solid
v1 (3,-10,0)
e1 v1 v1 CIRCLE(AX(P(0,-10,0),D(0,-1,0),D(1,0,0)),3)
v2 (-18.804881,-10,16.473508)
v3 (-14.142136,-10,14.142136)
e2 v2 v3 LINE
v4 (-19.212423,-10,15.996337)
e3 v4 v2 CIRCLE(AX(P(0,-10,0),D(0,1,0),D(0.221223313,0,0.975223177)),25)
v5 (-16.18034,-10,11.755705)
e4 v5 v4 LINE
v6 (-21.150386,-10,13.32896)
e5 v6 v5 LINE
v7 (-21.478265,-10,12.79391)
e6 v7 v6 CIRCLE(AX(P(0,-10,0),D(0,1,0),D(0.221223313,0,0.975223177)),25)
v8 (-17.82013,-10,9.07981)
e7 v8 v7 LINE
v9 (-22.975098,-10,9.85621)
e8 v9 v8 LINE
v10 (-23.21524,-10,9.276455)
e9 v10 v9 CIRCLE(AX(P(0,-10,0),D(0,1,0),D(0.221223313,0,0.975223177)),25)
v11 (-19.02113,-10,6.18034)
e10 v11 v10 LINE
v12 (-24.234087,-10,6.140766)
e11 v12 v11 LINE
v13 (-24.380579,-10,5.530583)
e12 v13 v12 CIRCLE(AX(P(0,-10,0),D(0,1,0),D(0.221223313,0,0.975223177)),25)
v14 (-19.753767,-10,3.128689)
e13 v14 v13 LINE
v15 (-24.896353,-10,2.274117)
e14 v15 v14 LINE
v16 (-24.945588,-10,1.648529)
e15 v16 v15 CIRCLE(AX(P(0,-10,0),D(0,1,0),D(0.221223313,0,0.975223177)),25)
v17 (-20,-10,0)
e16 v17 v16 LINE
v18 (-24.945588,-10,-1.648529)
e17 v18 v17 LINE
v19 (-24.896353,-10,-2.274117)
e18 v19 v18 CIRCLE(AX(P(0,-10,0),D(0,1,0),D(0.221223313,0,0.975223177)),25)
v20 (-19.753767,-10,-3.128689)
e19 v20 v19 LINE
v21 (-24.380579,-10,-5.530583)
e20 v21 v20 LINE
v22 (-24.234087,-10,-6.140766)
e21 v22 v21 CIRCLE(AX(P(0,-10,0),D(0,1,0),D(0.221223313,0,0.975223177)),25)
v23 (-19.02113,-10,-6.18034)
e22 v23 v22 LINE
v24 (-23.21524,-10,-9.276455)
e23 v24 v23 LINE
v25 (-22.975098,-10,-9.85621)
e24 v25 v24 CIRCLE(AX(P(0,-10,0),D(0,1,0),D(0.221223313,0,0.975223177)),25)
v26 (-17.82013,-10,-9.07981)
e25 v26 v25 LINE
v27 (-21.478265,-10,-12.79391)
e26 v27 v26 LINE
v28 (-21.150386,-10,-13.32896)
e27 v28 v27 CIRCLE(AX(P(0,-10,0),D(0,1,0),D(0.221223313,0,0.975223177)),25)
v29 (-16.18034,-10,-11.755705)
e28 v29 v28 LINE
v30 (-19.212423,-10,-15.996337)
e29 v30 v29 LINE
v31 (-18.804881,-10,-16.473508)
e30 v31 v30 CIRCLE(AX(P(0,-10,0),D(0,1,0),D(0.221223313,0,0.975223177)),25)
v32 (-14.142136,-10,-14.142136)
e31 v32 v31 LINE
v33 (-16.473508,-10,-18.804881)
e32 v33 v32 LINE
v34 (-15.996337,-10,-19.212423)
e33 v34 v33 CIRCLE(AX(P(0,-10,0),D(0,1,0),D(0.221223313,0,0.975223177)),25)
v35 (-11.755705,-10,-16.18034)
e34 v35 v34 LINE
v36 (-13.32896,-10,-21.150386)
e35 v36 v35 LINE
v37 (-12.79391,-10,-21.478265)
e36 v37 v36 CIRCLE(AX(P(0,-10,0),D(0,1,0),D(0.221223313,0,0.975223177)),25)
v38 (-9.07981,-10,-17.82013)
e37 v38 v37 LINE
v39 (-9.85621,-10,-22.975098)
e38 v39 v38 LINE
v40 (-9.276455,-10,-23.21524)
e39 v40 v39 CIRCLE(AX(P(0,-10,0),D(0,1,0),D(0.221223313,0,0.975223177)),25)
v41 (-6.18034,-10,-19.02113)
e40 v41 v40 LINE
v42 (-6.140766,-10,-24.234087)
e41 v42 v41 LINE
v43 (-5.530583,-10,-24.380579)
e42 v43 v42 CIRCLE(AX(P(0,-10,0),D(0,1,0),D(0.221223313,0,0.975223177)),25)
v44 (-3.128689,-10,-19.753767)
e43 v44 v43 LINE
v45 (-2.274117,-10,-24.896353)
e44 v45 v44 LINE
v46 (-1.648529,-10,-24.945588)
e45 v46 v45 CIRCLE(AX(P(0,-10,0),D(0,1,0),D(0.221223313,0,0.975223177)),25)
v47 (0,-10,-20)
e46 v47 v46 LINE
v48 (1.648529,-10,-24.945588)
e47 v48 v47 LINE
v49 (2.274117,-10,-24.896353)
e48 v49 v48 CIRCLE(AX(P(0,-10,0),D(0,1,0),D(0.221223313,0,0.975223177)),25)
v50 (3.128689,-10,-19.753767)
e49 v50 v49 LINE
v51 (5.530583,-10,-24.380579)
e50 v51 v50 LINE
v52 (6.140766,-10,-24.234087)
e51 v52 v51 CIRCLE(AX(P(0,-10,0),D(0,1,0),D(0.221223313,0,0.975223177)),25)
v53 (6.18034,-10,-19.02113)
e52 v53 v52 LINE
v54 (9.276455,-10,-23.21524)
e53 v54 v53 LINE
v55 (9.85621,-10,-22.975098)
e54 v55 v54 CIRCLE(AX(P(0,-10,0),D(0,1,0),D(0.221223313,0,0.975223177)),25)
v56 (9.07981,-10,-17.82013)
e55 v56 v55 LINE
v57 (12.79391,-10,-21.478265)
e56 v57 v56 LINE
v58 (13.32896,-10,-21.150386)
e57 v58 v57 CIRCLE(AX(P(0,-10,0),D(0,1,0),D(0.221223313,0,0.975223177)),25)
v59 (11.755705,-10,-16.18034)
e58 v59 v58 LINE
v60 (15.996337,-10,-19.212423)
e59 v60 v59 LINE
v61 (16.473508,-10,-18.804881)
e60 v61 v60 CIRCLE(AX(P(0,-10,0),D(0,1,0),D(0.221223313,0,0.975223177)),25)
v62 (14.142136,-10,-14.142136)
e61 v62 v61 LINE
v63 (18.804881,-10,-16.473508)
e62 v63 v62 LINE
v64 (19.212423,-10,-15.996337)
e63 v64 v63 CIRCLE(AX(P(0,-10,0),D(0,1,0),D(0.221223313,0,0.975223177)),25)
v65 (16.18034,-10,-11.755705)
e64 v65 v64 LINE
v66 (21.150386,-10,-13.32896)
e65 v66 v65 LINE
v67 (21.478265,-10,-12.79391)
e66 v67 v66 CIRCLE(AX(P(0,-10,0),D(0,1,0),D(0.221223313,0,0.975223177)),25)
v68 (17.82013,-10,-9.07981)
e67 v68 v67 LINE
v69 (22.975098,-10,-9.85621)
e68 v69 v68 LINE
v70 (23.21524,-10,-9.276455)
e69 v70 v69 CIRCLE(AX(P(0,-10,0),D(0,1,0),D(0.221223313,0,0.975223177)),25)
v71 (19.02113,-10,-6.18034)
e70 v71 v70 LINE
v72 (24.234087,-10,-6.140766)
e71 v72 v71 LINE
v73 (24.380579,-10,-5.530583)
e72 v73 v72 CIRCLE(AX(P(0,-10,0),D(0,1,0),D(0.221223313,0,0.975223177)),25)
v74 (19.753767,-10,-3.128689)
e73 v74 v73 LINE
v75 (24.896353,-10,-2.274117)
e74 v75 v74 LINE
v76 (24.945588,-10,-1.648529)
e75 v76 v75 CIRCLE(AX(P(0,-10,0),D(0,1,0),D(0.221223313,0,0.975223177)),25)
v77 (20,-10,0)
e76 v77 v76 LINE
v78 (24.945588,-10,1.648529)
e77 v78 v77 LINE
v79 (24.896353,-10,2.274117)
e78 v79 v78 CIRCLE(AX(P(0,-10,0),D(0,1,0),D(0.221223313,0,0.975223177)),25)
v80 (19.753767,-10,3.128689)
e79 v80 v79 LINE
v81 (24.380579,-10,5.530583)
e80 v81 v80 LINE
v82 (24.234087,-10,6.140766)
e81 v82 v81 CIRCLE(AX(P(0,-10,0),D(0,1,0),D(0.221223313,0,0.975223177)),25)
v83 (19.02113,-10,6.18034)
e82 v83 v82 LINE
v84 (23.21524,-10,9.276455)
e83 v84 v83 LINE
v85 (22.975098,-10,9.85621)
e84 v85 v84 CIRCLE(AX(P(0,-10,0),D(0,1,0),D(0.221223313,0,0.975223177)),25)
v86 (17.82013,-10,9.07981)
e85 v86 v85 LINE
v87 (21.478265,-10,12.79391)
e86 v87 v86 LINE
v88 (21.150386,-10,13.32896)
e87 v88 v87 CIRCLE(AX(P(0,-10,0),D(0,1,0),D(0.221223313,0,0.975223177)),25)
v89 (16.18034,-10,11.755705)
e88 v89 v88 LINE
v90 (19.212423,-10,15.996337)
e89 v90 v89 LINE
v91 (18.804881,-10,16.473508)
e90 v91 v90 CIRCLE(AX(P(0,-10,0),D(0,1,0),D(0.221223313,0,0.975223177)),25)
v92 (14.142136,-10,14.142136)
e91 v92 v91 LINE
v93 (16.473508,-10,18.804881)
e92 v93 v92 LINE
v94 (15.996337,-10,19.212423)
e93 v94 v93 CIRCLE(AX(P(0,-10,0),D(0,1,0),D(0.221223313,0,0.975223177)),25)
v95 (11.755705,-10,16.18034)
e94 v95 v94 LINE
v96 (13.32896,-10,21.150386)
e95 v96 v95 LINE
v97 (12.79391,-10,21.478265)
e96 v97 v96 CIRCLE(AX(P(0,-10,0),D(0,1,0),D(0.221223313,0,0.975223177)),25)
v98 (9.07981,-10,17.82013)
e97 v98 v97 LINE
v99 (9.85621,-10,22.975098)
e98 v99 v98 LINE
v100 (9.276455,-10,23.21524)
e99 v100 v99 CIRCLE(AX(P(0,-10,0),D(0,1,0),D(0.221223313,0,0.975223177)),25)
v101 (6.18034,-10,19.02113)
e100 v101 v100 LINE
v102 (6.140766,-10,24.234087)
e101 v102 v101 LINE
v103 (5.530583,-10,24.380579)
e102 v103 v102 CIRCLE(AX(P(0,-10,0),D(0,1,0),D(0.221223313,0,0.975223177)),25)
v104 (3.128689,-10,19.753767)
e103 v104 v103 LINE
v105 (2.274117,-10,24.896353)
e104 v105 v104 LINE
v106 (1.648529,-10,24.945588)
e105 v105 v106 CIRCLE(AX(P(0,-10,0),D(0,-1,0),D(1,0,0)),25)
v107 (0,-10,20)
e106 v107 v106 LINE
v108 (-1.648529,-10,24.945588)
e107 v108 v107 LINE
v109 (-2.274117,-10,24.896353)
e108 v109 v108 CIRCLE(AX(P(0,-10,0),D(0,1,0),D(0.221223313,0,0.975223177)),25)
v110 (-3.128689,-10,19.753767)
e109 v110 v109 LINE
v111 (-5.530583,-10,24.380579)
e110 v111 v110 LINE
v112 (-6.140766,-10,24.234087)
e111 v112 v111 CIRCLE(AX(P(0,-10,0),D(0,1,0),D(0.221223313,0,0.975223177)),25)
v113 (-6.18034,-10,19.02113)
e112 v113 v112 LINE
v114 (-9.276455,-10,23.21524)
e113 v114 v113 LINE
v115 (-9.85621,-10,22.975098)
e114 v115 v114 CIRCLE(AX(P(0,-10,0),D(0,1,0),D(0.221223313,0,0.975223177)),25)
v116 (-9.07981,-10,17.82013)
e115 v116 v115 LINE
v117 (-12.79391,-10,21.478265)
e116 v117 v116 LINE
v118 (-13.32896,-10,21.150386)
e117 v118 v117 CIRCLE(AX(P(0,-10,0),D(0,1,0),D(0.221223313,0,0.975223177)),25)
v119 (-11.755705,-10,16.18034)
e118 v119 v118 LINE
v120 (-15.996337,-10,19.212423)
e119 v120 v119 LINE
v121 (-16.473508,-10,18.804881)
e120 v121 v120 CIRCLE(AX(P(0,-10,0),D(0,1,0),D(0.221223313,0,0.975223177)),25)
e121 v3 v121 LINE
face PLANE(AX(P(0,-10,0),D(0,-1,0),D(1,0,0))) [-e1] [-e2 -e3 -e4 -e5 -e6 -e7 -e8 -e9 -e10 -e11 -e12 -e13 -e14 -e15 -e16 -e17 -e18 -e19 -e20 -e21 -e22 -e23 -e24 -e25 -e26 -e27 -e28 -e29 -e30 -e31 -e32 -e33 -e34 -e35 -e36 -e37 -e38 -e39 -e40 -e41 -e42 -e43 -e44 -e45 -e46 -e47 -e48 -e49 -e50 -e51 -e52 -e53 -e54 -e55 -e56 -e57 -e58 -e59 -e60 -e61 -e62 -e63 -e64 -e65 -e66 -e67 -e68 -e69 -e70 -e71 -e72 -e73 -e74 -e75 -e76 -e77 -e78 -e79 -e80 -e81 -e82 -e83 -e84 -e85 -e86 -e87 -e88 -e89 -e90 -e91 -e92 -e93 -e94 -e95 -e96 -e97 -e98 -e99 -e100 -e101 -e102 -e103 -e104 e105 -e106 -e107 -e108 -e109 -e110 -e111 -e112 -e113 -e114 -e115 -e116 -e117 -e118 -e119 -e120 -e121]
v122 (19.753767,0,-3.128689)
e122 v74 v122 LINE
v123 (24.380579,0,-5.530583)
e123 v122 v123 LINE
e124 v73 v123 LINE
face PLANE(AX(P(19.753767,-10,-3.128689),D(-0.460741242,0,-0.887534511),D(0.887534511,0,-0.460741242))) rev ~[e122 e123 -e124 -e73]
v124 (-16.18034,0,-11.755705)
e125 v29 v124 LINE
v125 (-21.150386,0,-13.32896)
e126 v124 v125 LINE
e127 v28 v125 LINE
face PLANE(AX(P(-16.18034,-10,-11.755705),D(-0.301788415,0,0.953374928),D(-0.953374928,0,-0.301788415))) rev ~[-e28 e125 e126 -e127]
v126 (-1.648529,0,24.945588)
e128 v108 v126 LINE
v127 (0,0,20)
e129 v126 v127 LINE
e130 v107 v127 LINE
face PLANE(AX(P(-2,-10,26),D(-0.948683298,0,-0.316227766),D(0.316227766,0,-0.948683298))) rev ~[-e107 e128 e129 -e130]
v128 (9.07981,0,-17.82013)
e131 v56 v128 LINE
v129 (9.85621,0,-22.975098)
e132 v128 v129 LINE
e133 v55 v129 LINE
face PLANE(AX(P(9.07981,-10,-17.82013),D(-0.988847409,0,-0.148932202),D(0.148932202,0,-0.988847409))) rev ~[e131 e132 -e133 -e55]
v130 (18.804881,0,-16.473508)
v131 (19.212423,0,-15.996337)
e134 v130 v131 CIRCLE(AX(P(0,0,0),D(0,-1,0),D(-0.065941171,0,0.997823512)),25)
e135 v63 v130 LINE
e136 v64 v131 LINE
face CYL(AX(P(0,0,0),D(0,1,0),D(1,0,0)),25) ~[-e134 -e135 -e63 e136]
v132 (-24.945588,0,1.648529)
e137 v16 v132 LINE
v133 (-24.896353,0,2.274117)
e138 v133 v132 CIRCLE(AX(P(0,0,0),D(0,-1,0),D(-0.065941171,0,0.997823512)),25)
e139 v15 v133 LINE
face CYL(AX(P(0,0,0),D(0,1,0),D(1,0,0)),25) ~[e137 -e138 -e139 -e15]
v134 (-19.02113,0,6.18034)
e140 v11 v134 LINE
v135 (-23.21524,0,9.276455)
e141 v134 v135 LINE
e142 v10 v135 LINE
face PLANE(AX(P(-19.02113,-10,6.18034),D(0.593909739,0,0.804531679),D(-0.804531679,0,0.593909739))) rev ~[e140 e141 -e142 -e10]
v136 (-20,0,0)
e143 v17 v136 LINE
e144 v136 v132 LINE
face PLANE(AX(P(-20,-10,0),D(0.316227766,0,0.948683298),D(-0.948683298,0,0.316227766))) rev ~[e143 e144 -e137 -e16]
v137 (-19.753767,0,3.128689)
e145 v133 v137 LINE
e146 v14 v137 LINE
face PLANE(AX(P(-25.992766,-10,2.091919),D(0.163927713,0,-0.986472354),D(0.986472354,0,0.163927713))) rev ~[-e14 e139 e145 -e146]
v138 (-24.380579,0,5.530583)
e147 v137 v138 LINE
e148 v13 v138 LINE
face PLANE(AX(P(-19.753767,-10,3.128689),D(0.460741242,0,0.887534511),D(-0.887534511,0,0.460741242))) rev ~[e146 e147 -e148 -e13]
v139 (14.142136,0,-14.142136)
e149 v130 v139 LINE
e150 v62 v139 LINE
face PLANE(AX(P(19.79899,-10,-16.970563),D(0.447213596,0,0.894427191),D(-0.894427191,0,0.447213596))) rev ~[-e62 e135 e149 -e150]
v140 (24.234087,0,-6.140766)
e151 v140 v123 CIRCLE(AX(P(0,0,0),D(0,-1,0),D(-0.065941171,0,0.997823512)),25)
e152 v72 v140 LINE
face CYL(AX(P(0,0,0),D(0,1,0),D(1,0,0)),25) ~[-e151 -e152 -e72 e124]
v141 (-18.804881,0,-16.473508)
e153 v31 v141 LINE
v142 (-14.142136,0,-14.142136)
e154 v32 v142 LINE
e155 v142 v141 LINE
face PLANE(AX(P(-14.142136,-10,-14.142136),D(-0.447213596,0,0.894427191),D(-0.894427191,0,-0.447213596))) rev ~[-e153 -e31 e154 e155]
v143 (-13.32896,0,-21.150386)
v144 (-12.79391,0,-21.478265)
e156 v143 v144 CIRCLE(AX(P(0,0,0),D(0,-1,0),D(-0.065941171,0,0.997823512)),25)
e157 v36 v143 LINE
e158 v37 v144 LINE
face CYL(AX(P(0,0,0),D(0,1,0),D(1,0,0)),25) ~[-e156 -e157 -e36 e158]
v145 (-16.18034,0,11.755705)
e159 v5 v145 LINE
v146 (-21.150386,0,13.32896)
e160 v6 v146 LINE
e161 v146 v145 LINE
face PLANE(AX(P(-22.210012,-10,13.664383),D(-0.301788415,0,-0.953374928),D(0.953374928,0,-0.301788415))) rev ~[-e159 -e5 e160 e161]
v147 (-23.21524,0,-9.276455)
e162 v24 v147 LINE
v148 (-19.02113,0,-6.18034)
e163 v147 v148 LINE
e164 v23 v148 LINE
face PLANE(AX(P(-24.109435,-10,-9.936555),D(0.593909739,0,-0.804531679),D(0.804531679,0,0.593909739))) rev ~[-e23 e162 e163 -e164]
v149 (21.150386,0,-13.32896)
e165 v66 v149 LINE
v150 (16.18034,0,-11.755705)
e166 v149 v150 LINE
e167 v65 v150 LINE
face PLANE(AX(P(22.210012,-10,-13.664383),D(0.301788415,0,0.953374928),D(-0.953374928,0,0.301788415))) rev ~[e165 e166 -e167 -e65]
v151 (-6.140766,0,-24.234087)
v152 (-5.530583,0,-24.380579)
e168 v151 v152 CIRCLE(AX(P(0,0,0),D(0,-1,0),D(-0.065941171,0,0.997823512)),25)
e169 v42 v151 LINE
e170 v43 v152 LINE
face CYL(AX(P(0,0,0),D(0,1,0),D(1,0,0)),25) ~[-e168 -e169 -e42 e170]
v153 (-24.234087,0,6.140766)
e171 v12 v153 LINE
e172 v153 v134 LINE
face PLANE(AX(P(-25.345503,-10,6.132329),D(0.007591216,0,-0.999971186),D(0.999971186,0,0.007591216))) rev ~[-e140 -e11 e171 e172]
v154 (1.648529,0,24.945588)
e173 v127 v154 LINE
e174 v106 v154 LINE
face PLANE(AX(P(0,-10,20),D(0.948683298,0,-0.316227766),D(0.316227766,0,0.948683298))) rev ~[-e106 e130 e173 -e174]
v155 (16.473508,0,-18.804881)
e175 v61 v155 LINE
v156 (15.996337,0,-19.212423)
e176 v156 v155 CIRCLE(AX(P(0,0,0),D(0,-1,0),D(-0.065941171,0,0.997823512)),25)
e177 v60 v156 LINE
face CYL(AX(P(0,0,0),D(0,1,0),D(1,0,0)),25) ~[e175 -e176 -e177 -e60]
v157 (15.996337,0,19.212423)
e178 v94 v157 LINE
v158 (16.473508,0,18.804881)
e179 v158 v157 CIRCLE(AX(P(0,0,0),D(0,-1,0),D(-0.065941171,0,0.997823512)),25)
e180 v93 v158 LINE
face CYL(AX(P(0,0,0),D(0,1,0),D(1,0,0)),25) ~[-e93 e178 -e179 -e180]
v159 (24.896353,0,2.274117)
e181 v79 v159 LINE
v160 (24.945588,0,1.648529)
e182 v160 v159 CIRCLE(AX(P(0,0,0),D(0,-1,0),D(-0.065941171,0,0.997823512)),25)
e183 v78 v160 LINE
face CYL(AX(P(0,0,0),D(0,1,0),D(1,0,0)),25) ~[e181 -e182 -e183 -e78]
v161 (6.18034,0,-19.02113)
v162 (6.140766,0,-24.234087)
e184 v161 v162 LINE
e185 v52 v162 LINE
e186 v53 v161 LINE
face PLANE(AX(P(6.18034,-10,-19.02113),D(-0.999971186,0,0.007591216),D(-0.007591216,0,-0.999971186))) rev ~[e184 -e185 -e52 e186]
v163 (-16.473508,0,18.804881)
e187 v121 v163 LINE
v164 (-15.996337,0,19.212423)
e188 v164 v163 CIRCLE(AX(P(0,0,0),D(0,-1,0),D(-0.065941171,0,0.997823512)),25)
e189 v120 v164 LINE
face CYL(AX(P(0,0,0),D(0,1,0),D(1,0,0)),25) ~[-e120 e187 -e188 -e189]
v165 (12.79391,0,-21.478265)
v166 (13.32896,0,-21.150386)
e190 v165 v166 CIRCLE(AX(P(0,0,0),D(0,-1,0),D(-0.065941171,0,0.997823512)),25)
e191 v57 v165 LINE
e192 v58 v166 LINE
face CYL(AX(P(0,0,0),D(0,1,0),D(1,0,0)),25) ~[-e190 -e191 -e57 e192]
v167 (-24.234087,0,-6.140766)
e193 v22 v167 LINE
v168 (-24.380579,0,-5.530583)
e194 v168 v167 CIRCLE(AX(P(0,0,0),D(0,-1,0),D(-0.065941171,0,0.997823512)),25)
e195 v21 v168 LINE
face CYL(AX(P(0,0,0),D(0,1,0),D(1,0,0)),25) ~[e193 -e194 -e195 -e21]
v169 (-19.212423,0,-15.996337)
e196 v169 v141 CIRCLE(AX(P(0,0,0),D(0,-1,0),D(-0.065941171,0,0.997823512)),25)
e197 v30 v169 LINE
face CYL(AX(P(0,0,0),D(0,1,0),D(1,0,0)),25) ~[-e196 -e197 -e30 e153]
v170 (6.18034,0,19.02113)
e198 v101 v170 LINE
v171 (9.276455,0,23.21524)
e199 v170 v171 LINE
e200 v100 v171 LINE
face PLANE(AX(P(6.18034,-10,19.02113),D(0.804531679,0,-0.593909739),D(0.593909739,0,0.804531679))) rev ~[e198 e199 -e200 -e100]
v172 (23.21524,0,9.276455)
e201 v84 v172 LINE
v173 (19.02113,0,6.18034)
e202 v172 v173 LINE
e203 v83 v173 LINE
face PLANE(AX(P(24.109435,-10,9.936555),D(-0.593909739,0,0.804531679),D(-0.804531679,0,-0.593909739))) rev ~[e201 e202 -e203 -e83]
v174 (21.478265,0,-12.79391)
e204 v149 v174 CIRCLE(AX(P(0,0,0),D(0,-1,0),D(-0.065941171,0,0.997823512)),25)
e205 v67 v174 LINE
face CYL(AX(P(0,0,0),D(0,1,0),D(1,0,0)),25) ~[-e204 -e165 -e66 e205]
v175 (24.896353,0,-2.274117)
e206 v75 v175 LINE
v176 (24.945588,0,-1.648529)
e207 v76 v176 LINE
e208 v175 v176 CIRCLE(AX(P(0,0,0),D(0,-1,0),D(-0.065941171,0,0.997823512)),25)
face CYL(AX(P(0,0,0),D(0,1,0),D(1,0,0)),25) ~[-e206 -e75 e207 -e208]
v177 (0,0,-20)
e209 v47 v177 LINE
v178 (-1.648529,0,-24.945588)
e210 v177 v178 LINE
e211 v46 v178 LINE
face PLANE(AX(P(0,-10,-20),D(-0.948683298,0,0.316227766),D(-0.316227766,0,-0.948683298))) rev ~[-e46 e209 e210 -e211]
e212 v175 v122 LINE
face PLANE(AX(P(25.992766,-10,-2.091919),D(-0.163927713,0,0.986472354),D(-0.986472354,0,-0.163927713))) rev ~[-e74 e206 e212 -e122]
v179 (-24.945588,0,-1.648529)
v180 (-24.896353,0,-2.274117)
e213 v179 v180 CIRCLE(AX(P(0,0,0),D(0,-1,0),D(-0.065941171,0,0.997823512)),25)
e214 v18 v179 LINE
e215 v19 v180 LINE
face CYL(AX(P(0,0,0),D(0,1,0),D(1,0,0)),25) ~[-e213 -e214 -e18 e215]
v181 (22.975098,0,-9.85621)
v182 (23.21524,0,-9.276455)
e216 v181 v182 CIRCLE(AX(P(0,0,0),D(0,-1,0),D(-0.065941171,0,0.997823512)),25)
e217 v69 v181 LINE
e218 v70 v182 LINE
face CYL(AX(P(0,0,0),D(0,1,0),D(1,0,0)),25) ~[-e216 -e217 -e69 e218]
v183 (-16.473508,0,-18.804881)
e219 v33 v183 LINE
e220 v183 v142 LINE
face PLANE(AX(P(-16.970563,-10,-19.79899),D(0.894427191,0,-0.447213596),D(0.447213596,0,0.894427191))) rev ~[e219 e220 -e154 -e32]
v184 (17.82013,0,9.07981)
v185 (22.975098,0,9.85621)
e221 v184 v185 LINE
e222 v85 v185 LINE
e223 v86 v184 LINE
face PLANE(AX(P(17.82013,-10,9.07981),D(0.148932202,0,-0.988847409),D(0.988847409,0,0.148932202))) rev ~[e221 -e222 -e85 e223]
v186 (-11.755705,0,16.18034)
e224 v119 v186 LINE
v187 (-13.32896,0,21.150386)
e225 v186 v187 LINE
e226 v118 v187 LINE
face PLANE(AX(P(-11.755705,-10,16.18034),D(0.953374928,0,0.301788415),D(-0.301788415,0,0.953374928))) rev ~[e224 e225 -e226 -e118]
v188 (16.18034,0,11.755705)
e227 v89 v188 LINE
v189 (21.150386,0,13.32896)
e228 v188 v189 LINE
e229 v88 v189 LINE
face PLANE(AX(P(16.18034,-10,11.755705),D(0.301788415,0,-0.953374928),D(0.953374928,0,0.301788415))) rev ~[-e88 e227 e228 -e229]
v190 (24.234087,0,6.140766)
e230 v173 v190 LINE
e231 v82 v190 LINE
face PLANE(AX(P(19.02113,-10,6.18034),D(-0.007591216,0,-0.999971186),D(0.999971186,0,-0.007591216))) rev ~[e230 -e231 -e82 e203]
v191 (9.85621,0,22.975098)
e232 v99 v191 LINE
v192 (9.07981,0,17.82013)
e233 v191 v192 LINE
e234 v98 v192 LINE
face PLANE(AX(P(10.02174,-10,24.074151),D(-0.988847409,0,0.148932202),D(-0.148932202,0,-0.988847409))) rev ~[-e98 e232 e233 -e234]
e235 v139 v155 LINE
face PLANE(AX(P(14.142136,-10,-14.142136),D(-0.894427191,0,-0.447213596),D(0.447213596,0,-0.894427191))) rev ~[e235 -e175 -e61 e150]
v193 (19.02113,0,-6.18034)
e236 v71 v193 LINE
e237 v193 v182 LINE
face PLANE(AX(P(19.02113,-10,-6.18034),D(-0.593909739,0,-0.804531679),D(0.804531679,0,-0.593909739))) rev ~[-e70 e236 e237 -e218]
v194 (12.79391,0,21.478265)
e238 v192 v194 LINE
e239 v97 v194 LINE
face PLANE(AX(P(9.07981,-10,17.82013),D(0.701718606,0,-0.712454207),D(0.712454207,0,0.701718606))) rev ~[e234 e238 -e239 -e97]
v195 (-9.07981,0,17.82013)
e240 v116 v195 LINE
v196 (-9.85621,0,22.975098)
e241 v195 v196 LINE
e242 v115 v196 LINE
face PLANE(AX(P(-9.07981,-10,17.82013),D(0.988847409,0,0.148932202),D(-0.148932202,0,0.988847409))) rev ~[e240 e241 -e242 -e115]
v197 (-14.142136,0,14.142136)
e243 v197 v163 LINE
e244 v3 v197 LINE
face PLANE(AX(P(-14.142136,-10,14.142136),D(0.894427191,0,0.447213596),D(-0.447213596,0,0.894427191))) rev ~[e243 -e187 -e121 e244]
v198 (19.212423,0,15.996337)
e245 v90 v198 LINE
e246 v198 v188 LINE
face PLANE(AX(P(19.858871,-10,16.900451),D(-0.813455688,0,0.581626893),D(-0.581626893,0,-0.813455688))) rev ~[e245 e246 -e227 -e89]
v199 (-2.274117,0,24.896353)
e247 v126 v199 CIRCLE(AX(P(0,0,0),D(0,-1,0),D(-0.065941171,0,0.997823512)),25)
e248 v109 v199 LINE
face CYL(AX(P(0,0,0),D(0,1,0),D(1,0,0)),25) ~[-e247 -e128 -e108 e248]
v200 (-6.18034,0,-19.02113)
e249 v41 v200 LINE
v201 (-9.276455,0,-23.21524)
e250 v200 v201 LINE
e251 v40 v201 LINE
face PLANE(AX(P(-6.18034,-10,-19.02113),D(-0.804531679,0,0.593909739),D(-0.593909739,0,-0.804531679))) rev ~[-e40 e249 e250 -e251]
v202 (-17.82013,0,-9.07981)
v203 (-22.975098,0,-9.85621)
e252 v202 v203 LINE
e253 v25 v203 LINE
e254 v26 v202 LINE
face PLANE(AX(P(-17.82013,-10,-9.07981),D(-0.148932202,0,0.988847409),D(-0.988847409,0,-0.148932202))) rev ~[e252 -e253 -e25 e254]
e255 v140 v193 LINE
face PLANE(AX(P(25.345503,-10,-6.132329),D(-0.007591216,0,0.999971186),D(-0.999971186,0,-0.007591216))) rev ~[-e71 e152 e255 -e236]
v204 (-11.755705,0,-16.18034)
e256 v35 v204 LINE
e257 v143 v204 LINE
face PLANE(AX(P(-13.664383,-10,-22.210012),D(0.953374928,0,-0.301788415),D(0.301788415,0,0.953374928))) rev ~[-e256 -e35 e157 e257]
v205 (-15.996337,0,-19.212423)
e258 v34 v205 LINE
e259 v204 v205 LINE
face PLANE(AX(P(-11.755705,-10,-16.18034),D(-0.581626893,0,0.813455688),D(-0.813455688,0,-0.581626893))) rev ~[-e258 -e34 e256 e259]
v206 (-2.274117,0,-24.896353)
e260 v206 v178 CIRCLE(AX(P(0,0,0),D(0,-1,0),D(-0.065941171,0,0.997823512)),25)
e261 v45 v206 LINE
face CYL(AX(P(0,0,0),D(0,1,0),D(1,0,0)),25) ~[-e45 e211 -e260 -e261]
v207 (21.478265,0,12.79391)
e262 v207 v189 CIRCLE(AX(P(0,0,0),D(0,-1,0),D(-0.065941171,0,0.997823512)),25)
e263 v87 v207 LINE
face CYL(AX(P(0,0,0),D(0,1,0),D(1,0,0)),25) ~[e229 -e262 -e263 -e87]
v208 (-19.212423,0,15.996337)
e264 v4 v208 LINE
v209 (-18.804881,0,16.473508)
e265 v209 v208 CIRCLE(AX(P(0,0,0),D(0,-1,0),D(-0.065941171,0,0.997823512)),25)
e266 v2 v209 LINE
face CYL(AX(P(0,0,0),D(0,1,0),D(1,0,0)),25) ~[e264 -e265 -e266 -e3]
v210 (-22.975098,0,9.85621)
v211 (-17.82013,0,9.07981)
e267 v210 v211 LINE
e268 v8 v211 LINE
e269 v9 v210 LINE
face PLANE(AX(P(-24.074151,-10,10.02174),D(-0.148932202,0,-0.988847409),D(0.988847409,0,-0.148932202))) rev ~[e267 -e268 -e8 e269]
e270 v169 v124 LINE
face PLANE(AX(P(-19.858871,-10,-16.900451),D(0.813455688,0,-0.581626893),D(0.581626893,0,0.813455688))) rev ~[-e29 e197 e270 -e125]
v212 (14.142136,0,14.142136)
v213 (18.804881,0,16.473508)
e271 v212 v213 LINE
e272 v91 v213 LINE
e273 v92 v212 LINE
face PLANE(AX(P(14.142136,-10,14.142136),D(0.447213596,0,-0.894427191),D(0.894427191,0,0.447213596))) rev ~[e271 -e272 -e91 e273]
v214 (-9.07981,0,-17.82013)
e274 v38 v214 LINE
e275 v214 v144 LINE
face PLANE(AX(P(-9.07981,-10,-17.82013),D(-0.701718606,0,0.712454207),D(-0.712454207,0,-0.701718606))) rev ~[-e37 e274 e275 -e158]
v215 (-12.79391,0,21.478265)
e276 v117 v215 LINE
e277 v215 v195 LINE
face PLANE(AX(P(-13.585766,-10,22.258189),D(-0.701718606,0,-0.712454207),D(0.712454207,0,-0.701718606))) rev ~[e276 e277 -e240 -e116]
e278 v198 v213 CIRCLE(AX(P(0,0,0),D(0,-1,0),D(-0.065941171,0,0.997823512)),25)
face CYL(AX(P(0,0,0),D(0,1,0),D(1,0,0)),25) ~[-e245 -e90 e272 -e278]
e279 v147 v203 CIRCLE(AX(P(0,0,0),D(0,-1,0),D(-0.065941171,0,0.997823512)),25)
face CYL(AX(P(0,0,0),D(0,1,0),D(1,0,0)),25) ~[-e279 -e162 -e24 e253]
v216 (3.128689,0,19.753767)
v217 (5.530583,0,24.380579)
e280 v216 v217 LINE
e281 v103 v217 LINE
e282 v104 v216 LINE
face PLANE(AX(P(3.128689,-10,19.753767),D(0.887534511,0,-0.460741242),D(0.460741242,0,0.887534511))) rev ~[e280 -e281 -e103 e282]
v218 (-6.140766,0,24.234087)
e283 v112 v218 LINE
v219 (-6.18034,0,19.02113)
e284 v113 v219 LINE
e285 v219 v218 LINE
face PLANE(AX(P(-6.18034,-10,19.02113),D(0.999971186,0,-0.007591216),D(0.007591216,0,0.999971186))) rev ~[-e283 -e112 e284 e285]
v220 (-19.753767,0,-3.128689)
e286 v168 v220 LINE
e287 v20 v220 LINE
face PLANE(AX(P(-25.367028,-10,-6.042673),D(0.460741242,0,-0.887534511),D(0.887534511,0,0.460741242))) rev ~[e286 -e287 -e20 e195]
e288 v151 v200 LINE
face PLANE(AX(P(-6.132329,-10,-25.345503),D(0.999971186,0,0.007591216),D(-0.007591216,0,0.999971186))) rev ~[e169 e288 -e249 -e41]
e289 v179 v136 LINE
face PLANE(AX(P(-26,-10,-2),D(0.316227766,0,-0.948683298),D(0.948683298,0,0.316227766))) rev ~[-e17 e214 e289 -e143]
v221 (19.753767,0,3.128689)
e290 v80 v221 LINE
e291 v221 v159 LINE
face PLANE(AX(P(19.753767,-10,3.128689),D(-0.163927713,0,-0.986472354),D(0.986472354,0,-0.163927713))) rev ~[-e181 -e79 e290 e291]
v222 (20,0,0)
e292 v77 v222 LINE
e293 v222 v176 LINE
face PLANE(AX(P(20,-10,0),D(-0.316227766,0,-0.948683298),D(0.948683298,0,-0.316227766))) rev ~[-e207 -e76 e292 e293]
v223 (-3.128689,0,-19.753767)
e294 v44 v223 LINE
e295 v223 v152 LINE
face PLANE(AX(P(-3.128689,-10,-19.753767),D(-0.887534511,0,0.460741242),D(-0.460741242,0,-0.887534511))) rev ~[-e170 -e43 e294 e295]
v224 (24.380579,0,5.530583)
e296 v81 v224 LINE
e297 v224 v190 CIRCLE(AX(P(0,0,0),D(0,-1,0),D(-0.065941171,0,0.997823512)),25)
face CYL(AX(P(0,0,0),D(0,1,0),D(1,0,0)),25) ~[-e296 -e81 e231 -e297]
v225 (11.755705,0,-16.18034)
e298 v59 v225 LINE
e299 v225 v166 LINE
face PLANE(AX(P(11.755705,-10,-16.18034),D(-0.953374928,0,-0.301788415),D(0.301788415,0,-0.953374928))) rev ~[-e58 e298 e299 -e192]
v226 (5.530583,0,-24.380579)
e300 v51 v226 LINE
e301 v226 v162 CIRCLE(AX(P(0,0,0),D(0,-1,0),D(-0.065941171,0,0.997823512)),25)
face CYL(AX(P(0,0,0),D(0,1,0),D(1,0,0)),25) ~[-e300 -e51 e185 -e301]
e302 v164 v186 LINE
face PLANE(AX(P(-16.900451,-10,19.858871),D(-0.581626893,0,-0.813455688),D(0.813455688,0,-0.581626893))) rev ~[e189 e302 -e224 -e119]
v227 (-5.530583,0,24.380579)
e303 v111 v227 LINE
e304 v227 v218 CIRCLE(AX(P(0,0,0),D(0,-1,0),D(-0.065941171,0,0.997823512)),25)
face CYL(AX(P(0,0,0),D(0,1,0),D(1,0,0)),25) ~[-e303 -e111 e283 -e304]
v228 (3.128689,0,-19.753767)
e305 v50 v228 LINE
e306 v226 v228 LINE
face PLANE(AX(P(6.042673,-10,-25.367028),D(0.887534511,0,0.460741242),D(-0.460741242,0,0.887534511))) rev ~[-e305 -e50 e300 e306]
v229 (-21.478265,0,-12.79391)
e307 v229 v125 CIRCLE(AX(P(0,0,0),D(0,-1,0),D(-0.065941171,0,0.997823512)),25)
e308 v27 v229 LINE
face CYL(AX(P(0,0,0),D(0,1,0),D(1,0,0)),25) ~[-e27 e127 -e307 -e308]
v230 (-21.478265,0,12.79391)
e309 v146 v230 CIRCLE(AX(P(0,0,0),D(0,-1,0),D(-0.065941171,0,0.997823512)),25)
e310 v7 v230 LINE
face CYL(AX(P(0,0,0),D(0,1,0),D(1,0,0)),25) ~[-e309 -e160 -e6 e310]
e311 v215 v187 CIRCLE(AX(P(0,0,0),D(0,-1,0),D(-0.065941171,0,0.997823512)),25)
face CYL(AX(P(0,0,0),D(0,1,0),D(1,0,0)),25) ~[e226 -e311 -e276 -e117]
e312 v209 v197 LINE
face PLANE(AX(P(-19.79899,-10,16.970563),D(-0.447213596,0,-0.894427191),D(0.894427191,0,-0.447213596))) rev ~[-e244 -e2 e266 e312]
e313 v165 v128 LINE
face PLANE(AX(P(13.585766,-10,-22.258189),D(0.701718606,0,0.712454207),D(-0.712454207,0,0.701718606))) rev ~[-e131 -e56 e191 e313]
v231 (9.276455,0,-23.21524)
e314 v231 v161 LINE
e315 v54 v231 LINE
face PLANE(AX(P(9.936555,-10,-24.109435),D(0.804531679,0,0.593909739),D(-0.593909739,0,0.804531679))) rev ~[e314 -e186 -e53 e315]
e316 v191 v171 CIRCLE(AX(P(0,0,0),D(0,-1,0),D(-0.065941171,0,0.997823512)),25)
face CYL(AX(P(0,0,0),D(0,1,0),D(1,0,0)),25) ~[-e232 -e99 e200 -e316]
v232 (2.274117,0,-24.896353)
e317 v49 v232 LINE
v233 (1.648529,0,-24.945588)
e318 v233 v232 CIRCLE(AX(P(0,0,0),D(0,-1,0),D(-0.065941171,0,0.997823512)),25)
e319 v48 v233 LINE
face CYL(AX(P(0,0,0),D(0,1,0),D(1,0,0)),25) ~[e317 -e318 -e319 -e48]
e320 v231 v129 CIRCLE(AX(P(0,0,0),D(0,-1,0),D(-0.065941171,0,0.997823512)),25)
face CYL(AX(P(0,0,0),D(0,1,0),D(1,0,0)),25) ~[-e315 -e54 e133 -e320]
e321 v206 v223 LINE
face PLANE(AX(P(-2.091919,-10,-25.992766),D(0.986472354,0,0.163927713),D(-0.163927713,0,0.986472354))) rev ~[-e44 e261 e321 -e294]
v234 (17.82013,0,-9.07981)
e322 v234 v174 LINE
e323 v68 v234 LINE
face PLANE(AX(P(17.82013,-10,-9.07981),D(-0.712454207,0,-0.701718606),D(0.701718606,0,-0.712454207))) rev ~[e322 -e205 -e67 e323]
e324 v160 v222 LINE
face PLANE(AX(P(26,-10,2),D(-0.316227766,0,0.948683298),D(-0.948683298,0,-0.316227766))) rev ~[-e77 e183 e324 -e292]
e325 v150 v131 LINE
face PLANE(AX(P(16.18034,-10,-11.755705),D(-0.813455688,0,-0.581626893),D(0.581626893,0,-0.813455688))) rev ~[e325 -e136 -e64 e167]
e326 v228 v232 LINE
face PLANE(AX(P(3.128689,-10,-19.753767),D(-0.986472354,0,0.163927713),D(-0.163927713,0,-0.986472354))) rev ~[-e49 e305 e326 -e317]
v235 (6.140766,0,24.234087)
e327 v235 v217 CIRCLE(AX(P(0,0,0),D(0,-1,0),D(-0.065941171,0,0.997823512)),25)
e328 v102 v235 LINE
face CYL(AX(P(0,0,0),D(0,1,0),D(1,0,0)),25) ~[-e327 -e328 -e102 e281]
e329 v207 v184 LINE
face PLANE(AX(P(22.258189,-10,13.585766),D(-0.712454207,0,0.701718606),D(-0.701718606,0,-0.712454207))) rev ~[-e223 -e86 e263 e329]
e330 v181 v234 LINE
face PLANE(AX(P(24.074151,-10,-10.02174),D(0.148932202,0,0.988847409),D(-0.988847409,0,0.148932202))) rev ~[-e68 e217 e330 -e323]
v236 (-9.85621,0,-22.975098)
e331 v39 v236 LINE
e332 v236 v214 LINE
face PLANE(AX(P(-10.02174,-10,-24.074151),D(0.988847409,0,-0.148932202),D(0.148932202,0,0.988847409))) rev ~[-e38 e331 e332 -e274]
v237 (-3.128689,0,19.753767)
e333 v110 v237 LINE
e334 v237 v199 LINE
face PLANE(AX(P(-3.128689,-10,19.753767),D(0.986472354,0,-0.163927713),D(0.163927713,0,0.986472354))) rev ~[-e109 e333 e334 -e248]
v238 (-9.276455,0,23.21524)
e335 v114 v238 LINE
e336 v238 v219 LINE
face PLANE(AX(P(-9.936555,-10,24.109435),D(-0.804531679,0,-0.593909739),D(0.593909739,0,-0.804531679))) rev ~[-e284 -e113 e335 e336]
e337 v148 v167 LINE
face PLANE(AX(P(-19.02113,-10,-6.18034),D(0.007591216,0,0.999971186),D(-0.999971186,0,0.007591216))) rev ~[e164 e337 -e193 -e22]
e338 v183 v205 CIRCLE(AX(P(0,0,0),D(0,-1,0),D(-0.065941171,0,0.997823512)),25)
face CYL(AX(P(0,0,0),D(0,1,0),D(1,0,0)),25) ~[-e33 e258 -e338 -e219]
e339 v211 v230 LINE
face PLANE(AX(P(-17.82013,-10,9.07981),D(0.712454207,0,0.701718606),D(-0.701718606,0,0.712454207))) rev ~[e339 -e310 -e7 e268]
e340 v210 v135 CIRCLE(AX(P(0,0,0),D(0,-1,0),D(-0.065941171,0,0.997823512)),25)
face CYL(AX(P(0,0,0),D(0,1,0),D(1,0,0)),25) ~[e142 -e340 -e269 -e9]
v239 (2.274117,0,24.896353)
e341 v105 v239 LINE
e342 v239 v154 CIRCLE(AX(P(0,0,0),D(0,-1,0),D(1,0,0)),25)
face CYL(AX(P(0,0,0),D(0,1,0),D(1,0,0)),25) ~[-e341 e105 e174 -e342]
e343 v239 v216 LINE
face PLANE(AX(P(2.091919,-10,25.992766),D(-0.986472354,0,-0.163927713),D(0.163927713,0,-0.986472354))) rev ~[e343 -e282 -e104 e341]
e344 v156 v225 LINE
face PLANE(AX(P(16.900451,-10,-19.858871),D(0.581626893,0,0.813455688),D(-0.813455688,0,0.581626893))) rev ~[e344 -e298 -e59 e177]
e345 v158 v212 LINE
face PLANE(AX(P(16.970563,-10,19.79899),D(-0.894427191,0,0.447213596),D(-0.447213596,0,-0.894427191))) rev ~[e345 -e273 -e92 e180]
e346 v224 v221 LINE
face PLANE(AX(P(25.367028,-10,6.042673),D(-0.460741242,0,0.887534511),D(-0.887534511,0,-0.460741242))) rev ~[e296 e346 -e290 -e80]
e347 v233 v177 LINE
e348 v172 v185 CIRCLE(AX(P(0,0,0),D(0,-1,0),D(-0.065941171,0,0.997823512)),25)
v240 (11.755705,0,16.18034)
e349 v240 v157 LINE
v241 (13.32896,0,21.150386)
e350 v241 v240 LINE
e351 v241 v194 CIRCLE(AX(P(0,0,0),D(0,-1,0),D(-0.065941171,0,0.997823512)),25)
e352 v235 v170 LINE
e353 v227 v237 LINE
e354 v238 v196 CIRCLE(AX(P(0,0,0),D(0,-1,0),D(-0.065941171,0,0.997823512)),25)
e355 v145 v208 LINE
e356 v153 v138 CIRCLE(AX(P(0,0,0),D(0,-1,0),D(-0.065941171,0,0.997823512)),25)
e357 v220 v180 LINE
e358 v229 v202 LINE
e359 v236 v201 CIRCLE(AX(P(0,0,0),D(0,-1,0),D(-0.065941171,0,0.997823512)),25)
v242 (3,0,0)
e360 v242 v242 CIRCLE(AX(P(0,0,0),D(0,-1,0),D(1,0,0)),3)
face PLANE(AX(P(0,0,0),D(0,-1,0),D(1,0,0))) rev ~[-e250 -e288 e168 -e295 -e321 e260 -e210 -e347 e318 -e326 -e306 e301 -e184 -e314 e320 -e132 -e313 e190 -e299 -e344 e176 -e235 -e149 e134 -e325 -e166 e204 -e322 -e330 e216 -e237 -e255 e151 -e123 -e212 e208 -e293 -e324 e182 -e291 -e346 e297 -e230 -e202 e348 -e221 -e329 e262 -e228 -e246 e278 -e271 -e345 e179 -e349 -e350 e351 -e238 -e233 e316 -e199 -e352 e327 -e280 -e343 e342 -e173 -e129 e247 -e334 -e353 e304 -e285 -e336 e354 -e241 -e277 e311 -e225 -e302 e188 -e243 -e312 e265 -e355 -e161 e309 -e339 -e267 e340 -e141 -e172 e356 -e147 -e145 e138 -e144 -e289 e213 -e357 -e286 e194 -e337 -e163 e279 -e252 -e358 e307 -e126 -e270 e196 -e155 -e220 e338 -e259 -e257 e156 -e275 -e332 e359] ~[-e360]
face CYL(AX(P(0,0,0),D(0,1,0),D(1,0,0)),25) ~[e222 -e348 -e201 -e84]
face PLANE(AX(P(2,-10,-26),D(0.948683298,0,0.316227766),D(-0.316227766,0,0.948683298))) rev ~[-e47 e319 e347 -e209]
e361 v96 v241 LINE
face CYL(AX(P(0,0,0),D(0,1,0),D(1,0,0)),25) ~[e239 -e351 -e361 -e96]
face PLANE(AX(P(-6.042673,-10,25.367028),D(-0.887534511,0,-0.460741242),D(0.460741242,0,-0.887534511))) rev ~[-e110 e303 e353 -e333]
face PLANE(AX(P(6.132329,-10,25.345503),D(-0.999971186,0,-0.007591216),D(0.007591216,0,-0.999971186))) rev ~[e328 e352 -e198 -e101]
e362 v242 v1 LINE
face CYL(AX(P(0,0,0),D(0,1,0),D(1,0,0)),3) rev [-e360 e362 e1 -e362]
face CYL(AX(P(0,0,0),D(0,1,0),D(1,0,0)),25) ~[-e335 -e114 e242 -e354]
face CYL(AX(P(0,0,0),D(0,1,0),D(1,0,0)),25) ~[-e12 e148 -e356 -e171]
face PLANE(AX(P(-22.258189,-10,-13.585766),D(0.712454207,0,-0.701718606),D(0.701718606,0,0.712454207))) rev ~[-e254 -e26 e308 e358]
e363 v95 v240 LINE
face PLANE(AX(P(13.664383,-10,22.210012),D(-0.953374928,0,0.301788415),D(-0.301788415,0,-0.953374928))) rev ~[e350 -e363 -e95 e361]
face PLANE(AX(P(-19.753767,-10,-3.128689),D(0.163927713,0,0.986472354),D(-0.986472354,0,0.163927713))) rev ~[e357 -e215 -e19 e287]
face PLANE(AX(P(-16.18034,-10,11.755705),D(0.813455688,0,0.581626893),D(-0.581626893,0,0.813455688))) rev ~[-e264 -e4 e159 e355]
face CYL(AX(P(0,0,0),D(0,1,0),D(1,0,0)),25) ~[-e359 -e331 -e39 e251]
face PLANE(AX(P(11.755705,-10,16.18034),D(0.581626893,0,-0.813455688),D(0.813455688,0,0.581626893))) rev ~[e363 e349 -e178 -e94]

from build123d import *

# Parameters (mm, degrees)
F0_R            = 25
F0_R_2          = 3
F1_DEPTH        = 10
F3_DEPTH        = 25
F3_COPIES_COUNT = 40


# Not quite as in the source:
# - a pattern or mirror of a feature is missing from the dataset's text; its kind, count and spacing are read off the source's solid


with BuildPart() as f1:
    # F0 (on Front) → F1 (new body)
    with BuildSketch(Plane.XZ):
        Circle(F0_R)
        Circle(F0_R_2, mode=Mode.SUBTRACT)
    extrude(amount=F1_DEPTH)

    # F2 (on face) → F3 (cut)
    with BuildSketch(Plane.XZ.offset(10)):
        Polygon((2, 26), (-2, 26), (0, 20), align=None)
    f3 = extrude(amount=-F3_DEPTH, mode=Mode.SUBTRACT)

    # F3_copies: F3 ×40 about axis
    f3_copies_axis = Axis((0, 0, 0), (0, 1, 0))
    for i in range(1, F3_COPIES_COUNT):
        add(f3.rotate(f3_copies_axis, i * 360 / F3_COPIES_COUNT), mode=Mode.SUBTRACT)


solid = f1.part
